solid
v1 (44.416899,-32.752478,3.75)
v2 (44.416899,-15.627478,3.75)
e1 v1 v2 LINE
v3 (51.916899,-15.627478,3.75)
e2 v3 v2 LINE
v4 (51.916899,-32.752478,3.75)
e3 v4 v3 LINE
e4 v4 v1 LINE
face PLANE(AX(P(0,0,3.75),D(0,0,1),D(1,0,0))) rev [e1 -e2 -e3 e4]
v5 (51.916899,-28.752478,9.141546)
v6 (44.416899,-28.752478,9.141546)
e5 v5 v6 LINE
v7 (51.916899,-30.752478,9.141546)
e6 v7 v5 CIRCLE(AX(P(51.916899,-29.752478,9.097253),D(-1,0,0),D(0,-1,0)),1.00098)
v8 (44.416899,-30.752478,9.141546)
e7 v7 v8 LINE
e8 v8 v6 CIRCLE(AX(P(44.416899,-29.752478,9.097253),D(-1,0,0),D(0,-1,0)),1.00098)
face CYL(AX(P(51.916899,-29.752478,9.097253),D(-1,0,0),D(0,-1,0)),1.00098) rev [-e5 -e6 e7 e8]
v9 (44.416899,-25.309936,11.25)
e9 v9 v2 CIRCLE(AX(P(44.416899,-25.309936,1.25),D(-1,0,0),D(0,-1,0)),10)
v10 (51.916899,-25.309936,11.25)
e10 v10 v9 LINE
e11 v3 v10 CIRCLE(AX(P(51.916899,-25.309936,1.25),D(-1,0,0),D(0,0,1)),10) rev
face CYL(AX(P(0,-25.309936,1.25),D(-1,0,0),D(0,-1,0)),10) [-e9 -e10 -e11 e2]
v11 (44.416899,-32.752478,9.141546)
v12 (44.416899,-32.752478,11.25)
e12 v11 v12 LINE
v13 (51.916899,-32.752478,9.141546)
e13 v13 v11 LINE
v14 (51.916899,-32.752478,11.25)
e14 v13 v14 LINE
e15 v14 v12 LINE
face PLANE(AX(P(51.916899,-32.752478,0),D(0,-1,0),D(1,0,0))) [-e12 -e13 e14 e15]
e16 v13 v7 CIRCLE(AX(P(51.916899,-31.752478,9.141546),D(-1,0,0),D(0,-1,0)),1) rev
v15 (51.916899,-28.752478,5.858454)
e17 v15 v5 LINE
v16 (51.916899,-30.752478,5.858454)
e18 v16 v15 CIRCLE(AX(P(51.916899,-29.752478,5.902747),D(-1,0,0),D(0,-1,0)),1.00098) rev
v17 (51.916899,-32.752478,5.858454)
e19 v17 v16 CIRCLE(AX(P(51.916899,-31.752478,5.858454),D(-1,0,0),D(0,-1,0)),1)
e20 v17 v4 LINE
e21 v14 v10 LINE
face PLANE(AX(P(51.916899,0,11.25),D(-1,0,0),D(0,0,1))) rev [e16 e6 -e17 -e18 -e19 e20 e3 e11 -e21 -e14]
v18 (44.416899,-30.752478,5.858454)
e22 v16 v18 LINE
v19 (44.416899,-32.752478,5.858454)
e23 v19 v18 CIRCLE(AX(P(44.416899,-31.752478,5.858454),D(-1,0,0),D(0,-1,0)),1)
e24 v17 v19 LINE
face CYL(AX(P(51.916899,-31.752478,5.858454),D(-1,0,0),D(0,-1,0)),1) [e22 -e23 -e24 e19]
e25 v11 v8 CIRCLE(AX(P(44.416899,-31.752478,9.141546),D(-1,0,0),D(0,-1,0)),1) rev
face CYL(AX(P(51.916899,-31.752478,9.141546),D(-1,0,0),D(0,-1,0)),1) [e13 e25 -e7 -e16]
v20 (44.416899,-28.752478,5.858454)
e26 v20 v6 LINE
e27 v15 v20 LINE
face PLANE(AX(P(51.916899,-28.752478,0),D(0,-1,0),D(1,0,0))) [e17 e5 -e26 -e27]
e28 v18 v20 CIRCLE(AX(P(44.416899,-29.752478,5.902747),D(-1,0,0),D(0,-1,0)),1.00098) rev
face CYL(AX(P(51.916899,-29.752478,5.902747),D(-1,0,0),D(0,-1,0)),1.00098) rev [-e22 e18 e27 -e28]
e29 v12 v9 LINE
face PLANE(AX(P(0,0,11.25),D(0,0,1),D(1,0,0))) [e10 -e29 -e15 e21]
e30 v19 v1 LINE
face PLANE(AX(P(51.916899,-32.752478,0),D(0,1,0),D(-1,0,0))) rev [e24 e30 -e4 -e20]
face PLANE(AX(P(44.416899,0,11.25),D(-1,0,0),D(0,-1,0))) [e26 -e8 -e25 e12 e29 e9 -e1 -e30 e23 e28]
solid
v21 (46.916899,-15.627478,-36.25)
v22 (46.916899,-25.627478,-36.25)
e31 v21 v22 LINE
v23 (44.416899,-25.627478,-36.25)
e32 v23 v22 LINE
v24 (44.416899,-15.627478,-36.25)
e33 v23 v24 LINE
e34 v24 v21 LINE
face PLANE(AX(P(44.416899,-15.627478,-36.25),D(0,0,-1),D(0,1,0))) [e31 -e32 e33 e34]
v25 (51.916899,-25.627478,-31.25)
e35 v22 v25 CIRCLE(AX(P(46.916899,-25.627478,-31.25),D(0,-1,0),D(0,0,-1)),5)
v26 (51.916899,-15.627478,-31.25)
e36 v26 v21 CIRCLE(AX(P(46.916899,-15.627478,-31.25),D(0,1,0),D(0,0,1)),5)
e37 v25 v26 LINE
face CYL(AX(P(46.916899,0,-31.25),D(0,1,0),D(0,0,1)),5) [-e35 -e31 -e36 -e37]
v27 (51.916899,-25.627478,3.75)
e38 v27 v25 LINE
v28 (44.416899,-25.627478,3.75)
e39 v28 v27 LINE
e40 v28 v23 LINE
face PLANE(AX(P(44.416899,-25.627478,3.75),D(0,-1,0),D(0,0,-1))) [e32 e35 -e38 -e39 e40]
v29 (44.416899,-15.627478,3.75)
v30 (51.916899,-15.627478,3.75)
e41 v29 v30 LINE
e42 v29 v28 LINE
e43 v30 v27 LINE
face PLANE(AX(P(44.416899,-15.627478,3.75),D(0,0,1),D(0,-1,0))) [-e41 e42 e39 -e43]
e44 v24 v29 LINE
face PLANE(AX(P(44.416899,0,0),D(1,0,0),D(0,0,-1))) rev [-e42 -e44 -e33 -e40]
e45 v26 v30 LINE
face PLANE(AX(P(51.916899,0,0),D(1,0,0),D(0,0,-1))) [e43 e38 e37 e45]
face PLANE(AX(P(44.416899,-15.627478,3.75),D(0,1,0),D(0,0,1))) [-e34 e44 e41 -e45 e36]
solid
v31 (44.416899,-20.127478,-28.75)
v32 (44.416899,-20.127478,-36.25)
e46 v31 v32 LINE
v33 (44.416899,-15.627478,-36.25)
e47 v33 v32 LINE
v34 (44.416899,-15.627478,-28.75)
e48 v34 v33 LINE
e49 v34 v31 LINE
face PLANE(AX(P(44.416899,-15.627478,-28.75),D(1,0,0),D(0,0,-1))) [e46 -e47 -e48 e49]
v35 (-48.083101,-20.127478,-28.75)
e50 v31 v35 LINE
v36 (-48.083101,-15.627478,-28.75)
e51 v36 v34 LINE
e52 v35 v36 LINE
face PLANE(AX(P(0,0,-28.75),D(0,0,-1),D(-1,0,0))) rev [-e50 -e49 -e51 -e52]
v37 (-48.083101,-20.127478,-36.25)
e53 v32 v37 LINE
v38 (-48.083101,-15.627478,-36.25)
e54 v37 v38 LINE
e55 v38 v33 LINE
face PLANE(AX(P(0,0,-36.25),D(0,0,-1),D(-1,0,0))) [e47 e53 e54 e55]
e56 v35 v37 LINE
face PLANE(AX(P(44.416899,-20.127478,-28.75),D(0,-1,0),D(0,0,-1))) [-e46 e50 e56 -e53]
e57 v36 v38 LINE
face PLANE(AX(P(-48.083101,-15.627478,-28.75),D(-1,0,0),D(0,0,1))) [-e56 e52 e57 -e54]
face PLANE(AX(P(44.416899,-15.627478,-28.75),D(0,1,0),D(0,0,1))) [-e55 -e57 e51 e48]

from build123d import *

# Parameters (mm, degrees)
PUSHER_BASE_DEPTH   = 15
SKETCH3_R           = 1.95
SCREW_HOLE_DEPTH    = 7.5
SKETCH6_W           = 7.5
SKETCH6_H           = 30.25
PUSHER_HEAD_DEPTH   = 3.75
FILLET1_R           = 2
CUT_EXTRUDE1_DEPTH  = 7.5
SKETCH9_W           = 40
SKETCH9_H           = 10
BOSS_EXTRUDE1_DEPTH = 7.5
SKETCH10_W          = 92.5
SKETCH10_H          = 4.5
BOSS_EXTRUDE2_DEPTH = 7.5
FILLET7_R           = 10
FILLET8_R           = 5
SKETCH13_W          = 41.9274774
SKETCH13_H          = 25.253149212
CUT_EXTRUDE2_DEPTH  = 26


with BuildPart() as part:
    # Sketch1 → pusher base (new body)
    with BuildSketch(Plane.XY):
        Polygon((59.166899441, -45.877477752), (51.666899441, -45.877477752), (44.666899441, -45.877477752), (37.166899441, -45.877477752), (37.166899441, -69.377477752), (41.916899441, -69.377477752), (41.916899441, -64.127477752), (54.416899441, -64.127477752), (54.416899441, -69.377477752), (59.166899441, -69.377477752), align=None)
        with BuildLine():
            Line((48.279417247, -51.877477752), (48.054381634, -51.877477752))
            ThreePointArc((48.054381634, -51.877477752), (39.166899441, -50.877477752), (48.054381634, -49.877477752))
            Line((48.054381634, -49.877477752), (48.279417247, -49.877477752))
            ThreePointArc((48.279417247, -49.877477752), (57.166899441, -50.877477752), (48.279417247, -51.877477752))
        make_face(mode=Mode.SUBTRACT)
    extrude(amount=PUSHER_BASE_DEPTH)

    # Sketch3 → screw hole (cut)
    with BuildSketch(Plane.XZ.offset(64.127477752)):
        with Locations(Location((48.166899441, 7.5, 0), (0, 0, 270))):
            Circle(SKETCH3_R)
    extrude(amount=-SCREW_HOLE_DEPTH, mode=Mode.SUBTRACT)

    # Sketch6 → pusher head (add, symmetric)
    with BuildSketch(Plane.XY.offset(7.5)):
        with Locations((48.166899441, -30.752477752)):
            Rectangle(SKETCH6_W, SKETCH6_H)
    extrude(amount=PUSHER_HEAD_DEPTH, both=True)

    # Fillet1
    # the kernel refuses this fillet: 2 mm, written as the material it takes off along each edge
    with BuildSketch(Plane(origin=(64.166899441, -45.877477752, 0), x_dir=(0, -1, 0), z_dir=(-1, 0, 0)), Plane(origin=(32.166899441, -45.877477752, 15), x_dir=(0, -1, 0), z_dir=(1, 0, 0))) as fillet1_piece_1:
        with BuildLine():
            CenterArc((FILLET1_R, FILLET1_R), FILLET1_R, 180, 90)
            Line((0, FILLET1_R), (0, 0))
            Line((0, 0), (FILLET1_R, 0))
        make_face()
    extrude(amount=32, mode=Mode.SUBTRACT)

    # Sketch12 → Cut-Extrude1 (cut)
    with BuildSketch(Plane.ZY.offset(-44.416899441)):
        with BuildLine():
            ThreePointArc((5.858454214, -30.752477752), (6.858454214, -31.752477752), (5.858454214, -32.752477752))
            Line((5.858454214, -32.752477752), (3.75, -32.752477752))
            Line((3.75, -32.752477752), (3.75, -45.877477752))
            Line((3.75, -45.877477752), (11.25, -45.877477752))
            Line((11.25, -45.877477752), (11.25, -32.752477752))
            Line((11.25, -32.752477752), (9.141545786, -32.752477752))
            ThreePointArc((9.141545786, -32.752477752), (8.141545786, -31.752477752), (9.141545786, -30.752477752))
            ThreePointArc((9.141545786, -30.752477752), (10.09823306, -29.752477752), (9.141545786, -28.752477752))
            Line((9.141545786, -28.752477752), (5.858454214, -28.752477752))
            ThreePointArc((5.858454214, -28.752477752), (4.90176694, -29.752477752), (5.858454214, -30.752477752))
        make_face()
    extrude(amount=-CUT_EXTRUDE1_DEPTH, mode=Mode.SUBTRACT)


with BuildPart() as cut_extrude1_piece_1:
    # of the separate pieces the step leaves, piece 1, a body of its own (cut_extrude1_pieces)
    add(part.part.solids().sort_by_distance((54.416899441, -69.377477752, 0))[0])

    # Sketch13 → Cut-Extrude2 (cut)
    with BuildSketch(Plane(origin=(0, -45.877477752, 0), x_dir=(1, 0, 0), z_dir=(0, 1, 0))):
        with Locations((48.381862236, -7.484888467)):
            Rectangle(SKETCH13_W, SKETCH13_H)
    extrude(amount=-CUT_EXTRUDE2_DEPTH, mode=Mode.SUBTRACT)


with BuildPart() as cut_extrude1_piece_2:
    # of the separate pieces the step leaves, piece 2, a body of its own (cut_extrude1_pieces)
    add(part.part.solids().sort_by_distance((51.916899441, -15.627477752, 3.75))[0])

    # Fillet7
    # the kernel refuses this fillet: 10 mm, written as the material it takes off along each edge
    with BuildSketch(Plane(origin=(76.123045355, -15.627477752, 11.25), x_dir=(0, 0, -1), z_dir=(-1, 0, 0))) as fillet7_piece_1:
        with BuildLine():
            CenterArc((10, 9.682458366), FILLET7_R, 180, 75.522487814)
            Line((0, 9.682458366), (-0.2, 9.682458366))
            Line((-0.2, 9.682458366), (-0.2, 0))
            Line((-0.2, 0), (0, -0.2))
            ThreePointArc((0, -0.2), (3.75, -0.2), (7.45, -0.193649167))
            Line((7.45, -0.193649167), (7.5, 0))
        make_face()
    extrude(amount=55.912291828, mode=Mode.SUBTRACT)


with BuildPart() as body_3:
    # Sketch9 → Boss-Extrude1 (new body)
    with BuildSketch(Plane(origin=(51.916899441, 0, 0), x_dir=(0, 0, -1), z_dir=(1, 0, 0))):
        with Locations((16.25, -20.627477752)):
            Rectangle(SKETCH9_W, SKETCH9_H)
    extrude(amount=-BOSS_EXTRUDE1_DEPTH)

    # Fillet8
    fillet8_edges = [body_3.edges().sort_by_distance(p)[0] for p in [
        (51.916899441, -20.627477752, -36.25),
    ]]
    fillet(fillet8_edges, radius=FILLET8_R)


with BuildPart() as body_4:
    # Sketch10 → Boss-Extrude2 (new body)
    with BuildSketch(Plane(origin=(0, 0, -36.25), x_dir=(-1, 0, 0), z_dir=(0, 0, -1))):
        with Locations((1.833100559, -17.877477752)):
            Rectangle(SKETCH10_W, SKETCH10_H)
    extrude(amount=-BOSS_EXTRUDE2_DEPTH)


solid = Compound([cut_extrude1_piece_2.part, body_3.part, body_4.part])
